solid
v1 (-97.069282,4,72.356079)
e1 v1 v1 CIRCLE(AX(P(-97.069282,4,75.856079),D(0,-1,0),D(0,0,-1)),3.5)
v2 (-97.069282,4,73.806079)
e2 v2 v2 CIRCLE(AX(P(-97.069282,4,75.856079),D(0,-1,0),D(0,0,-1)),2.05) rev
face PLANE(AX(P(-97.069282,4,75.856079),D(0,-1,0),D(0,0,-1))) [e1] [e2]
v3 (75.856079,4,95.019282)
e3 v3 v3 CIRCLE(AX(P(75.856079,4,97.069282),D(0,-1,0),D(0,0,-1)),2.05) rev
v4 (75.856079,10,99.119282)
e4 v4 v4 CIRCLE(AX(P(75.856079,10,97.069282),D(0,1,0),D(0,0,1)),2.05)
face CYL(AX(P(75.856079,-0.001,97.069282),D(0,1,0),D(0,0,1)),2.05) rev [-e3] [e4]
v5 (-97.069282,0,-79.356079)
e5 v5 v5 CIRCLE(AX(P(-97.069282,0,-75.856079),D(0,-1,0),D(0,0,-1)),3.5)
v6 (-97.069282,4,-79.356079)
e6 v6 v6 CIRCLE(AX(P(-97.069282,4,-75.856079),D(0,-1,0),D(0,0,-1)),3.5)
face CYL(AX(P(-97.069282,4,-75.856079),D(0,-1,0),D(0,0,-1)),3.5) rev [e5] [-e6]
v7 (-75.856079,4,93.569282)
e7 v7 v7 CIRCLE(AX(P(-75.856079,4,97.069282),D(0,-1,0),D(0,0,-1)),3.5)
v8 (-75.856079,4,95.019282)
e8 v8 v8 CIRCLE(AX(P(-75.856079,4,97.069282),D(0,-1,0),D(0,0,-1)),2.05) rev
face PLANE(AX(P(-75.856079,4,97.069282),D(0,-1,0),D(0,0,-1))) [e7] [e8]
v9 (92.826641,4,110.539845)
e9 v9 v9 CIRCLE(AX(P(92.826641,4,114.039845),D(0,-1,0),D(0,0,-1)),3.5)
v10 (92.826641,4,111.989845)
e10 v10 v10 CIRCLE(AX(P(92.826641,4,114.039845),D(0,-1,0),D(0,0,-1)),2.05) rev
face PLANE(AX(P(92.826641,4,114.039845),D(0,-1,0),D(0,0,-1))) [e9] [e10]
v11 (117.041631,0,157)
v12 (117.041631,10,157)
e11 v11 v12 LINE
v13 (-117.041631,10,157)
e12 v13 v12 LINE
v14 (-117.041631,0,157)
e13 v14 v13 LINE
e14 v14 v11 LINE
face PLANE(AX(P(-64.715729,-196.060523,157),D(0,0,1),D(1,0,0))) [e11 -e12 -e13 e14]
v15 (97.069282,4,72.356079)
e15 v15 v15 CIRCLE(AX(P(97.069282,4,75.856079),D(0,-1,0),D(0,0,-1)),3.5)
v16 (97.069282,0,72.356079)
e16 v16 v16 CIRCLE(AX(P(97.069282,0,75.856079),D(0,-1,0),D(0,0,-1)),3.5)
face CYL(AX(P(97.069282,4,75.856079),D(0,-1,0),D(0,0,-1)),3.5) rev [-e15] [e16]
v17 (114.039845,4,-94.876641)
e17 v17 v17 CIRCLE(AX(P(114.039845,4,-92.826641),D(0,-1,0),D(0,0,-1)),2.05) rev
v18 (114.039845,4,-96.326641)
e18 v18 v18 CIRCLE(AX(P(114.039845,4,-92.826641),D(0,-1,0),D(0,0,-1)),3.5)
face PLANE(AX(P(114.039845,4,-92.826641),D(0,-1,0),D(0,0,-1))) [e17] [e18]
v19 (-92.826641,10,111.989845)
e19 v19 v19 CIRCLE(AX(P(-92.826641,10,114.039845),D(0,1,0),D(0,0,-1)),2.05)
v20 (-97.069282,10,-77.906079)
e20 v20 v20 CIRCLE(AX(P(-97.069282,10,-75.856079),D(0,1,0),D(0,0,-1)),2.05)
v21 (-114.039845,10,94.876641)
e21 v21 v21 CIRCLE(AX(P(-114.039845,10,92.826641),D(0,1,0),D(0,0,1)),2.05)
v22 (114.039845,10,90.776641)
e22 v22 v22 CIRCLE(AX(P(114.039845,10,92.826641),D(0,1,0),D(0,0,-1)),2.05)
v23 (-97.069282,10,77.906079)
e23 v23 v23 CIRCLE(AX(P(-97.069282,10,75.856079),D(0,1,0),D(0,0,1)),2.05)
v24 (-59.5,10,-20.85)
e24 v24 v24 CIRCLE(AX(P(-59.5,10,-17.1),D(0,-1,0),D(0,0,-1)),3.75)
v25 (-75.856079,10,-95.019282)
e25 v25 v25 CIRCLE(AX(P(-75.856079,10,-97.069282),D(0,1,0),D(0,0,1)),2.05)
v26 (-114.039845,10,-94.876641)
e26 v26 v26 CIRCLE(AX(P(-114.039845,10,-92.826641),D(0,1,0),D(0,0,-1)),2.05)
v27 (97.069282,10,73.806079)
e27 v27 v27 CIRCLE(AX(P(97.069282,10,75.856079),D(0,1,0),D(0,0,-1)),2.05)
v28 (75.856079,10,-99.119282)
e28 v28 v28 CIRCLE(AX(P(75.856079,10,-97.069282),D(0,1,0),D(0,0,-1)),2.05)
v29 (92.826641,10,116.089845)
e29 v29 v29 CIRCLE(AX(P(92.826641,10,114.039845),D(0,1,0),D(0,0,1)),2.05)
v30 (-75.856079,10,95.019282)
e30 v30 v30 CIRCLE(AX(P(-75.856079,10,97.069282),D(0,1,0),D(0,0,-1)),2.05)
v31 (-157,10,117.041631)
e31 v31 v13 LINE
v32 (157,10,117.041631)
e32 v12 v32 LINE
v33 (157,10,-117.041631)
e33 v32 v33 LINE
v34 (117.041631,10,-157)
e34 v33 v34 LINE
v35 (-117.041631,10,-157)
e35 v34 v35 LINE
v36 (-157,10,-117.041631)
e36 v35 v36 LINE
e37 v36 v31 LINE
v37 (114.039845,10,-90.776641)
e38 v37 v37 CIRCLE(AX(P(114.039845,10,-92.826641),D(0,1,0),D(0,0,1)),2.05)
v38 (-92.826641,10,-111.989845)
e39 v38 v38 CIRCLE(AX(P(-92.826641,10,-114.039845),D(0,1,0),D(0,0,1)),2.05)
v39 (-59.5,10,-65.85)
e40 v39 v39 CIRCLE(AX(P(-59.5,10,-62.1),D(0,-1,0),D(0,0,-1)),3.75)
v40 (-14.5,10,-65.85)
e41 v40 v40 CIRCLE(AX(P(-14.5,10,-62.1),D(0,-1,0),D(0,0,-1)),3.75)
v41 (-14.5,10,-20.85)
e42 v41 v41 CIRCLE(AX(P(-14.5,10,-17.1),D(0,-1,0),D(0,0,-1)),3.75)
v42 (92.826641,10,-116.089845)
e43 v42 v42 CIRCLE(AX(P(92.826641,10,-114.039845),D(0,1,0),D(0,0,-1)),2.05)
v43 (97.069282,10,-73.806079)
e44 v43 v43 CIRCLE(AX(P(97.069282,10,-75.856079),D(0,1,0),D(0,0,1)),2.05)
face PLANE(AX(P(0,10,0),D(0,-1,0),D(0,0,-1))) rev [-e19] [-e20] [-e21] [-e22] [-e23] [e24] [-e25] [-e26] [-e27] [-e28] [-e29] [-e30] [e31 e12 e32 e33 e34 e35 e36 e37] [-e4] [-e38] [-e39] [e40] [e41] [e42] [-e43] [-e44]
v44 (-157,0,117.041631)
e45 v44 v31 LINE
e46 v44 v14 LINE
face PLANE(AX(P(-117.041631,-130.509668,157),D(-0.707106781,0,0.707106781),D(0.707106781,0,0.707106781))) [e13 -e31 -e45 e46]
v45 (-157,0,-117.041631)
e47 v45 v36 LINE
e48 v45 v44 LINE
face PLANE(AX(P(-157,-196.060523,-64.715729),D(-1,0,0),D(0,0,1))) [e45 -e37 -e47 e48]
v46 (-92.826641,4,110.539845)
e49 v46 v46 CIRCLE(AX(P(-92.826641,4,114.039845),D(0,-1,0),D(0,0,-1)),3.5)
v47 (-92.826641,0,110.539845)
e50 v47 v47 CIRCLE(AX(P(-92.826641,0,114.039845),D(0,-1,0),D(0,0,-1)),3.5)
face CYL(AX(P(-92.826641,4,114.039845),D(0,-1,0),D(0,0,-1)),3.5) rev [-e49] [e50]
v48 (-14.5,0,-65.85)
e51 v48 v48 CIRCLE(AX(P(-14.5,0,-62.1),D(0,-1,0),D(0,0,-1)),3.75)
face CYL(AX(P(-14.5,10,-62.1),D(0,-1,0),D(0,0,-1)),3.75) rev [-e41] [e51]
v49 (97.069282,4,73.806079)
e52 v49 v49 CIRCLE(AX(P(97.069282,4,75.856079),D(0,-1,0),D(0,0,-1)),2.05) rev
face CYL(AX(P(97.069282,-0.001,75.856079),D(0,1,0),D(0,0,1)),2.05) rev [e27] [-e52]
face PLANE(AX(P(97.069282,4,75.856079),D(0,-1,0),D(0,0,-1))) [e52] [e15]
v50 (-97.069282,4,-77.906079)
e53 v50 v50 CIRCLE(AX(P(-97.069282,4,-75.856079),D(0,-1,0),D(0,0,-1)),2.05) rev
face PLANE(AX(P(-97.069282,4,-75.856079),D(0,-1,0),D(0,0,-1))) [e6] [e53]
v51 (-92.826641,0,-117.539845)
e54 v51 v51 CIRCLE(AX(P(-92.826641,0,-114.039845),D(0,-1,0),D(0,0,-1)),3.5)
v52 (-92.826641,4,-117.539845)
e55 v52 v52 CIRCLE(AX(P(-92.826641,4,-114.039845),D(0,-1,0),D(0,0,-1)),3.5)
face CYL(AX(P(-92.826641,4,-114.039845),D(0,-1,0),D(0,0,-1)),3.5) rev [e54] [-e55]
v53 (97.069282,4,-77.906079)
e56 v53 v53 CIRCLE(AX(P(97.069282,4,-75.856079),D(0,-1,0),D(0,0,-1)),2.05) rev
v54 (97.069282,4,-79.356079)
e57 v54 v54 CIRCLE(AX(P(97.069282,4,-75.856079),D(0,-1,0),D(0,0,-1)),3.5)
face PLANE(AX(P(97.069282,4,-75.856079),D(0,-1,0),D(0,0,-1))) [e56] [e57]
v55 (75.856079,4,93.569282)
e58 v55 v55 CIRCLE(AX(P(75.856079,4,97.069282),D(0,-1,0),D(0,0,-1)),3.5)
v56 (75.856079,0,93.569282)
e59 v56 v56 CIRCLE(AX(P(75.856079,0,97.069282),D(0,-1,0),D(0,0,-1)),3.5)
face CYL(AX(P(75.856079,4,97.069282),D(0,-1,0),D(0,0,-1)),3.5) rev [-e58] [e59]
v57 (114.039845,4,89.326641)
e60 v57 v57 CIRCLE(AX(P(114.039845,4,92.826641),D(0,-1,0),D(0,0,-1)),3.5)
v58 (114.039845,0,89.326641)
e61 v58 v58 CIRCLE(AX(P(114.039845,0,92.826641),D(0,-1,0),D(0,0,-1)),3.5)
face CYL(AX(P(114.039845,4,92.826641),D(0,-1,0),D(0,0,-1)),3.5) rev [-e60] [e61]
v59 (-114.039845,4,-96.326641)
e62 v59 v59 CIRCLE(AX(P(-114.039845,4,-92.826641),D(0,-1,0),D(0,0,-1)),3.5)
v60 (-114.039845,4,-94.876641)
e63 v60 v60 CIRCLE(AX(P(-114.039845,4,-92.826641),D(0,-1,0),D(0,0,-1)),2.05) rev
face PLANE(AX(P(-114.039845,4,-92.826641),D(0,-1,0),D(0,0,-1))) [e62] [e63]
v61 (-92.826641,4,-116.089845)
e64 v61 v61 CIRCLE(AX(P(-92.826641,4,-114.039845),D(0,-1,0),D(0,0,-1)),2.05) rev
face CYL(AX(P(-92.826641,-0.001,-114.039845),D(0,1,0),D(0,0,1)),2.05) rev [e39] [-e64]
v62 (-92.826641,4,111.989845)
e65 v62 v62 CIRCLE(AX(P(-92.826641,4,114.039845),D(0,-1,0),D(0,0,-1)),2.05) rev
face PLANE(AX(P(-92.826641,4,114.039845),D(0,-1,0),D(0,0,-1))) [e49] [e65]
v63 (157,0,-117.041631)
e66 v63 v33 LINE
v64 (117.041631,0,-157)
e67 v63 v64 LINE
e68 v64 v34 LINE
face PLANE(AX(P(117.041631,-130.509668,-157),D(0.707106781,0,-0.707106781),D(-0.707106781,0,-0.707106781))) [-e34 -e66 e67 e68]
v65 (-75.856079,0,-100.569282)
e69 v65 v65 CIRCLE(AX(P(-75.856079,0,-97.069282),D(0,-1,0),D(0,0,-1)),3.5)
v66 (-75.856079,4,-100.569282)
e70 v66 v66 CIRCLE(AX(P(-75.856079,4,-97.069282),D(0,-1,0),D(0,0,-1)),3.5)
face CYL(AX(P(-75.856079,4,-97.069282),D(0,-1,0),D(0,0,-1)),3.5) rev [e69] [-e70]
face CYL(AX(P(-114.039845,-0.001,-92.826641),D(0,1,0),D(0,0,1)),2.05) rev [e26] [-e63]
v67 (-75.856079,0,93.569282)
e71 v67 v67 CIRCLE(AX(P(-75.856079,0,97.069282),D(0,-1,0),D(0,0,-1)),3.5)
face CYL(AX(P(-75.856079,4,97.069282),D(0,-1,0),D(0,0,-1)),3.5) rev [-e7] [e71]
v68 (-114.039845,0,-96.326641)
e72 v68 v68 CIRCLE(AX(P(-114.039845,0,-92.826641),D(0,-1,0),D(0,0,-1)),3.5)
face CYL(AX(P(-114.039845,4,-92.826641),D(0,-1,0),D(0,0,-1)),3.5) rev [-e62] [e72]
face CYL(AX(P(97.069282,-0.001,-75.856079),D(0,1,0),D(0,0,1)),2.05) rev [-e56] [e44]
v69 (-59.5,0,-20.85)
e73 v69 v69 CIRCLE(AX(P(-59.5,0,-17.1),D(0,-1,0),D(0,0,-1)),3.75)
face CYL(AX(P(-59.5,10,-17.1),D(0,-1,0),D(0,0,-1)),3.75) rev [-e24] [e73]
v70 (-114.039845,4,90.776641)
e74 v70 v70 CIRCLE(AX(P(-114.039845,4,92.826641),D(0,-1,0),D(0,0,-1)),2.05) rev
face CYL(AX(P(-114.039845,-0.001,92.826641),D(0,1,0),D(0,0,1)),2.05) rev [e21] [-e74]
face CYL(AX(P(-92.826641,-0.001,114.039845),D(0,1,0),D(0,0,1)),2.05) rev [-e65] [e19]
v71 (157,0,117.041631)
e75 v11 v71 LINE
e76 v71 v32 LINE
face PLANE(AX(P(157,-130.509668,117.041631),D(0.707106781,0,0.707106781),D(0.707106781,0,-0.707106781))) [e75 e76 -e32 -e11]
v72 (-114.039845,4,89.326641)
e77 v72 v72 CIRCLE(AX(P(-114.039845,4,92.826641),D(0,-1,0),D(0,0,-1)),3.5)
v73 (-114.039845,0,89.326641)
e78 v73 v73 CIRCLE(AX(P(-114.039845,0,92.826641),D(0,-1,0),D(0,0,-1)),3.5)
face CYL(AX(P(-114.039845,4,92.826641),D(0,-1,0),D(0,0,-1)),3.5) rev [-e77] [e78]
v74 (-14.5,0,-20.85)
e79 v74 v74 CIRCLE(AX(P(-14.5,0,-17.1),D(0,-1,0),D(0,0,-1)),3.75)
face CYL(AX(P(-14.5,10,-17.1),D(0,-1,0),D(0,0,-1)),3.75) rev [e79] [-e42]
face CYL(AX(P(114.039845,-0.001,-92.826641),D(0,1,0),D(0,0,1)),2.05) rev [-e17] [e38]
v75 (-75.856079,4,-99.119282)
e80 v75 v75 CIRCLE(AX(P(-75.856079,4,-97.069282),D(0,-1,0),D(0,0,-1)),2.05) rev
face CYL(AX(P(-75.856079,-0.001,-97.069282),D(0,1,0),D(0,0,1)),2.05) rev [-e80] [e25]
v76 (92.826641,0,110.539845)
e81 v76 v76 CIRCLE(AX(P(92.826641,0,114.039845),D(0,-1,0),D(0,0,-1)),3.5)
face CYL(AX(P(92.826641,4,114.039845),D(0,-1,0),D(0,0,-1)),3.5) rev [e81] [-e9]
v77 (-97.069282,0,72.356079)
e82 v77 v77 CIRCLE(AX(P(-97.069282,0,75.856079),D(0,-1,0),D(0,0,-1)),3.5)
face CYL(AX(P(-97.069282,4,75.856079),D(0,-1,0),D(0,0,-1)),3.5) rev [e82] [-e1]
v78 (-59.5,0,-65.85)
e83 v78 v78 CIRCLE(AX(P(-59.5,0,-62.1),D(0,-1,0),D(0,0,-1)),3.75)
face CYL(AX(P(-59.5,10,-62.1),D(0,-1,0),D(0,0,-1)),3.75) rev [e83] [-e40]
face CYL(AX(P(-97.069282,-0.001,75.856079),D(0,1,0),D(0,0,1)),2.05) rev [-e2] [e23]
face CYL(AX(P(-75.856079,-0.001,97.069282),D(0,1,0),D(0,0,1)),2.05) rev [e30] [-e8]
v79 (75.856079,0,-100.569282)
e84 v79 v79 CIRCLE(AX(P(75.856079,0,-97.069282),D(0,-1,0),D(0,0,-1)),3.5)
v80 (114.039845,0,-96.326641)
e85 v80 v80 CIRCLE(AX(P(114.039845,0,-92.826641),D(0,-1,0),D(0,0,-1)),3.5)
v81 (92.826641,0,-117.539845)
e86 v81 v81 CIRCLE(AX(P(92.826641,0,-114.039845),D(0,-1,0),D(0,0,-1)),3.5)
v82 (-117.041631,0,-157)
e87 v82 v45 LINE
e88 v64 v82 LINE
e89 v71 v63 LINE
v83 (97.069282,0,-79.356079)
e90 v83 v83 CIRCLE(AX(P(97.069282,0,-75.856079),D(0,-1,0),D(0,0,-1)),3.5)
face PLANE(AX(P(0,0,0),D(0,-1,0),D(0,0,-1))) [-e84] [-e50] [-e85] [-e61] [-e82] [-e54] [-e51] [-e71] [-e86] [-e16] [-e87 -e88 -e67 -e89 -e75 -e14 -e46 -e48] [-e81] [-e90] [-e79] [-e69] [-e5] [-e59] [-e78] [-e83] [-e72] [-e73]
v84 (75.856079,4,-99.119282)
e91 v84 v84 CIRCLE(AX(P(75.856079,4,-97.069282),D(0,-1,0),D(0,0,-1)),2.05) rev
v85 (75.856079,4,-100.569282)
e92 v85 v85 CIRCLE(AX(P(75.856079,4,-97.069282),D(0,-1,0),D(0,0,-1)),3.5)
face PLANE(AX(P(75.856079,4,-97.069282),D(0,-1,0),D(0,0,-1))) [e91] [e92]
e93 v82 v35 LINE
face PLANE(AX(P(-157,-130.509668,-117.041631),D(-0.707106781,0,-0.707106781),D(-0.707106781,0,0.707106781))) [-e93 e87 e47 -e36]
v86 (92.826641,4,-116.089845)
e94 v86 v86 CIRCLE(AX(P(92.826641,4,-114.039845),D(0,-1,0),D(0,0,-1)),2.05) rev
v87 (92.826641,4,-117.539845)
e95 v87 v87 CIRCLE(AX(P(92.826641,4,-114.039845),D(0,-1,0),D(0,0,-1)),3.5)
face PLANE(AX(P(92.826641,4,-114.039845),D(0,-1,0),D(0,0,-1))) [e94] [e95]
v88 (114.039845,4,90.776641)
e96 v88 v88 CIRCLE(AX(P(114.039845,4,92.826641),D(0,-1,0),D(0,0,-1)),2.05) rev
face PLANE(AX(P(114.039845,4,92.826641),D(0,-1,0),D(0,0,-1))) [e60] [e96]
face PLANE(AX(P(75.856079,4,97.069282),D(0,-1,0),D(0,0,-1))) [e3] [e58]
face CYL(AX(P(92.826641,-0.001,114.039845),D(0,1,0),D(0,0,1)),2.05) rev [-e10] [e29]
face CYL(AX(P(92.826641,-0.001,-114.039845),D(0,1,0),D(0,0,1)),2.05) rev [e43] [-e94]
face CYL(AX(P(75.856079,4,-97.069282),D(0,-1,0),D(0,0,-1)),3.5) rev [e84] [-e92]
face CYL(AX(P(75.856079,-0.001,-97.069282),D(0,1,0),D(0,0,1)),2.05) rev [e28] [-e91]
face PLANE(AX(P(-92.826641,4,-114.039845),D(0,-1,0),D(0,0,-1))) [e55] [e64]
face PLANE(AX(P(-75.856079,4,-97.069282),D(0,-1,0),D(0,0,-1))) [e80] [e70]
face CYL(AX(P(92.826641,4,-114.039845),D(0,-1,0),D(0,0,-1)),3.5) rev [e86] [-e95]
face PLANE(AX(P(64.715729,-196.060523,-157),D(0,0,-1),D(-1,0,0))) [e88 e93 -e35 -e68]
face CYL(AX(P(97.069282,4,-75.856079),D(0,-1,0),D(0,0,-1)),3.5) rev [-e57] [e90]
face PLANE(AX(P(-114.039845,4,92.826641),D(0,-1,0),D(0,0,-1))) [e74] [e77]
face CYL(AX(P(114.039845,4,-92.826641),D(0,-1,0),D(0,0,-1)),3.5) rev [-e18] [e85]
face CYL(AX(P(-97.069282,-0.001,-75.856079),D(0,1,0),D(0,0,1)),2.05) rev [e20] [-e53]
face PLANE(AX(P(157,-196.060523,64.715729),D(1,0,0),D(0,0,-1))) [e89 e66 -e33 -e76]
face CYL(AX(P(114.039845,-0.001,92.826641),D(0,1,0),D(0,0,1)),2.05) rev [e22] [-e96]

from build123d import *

# Parameters (mm, degrees)
BOSS_EXTRUDE1_DEPTH = 10
CUT_EXTRUDE1_REACH  = 179.059
SKETCH2_R           = 2.05
BOSS_EXTRUDE2_DEPTH = 10
BOSS_EXTRUDE3_DEPTH = 10
SKETCH5_R           = 3.5
CUT_EXTRUDE2_DEPTH  = 4
SKETCH6_R           = 3.75
CUT_EXTRUDE4_DEPTH  = 223.256608451


# Read off the part's stored shape, not the designer's step: moBlkMgr[DitRB1]
with BuildPart() as part:
    # Sketch1 → Boss-Extrude1 (new body)
    with BuildSketch(Plane(origin=(0, 0, 0), x_dir=(1, 0, 0), z_dir=(0, 1, 0))):
        Polygon((-96.715728753, 125), (-125, 96.715728753), (-125, -96.715728753), (-96.715728753, -125), (96.715728753, -125), (125, -96.715728753), (125, 96.715728753), (96.715728753, 125), align=None)
    extrude(amount=BOSS_EXTRUDE1_DEPTH)

    # Sketch2 → Cut-Extrude1 (cut, up to next)
    with BuildSketch(Plane(origin=(0, 10, 0), x_dir=(1, 0, 0), z_dir=(0, 1, 0)), mode=Mode.PRIVATE) as cut_extrude1_sk1:
        with Locations(Location((-97.069282143, -75.856078708, 0), (0, 0, 270))):
            Circle(SKETCH2_R)
    cut_extrude1_tool1 = extrude(cut_extrude1_sk1.sketch, amount=-CUT_EXTRUDE1_REACH, mode=Mode.PRIVATE) & part.part
    # Sketch2 → Cut-Extrude1 (cut, up to next)
    with BuildSketch(Plane(origin=(0, 10, 0), x_dir=(1, 0, 0), z_dir=(0, 1, 0)), mode=Mode.PRIVATE) as cut_extrude1_sk2:
        with Locations(Location((-114.039844892, -92.826641456, 0), (0, 0, 270))):
            Circle(SKETCH2_R)
    cut_extrude1_tool2 = extrude(cut_extrude1_sk2.sketch, amount=-CUT_EXTRUDE1_REACH, mode=Mode.PRIVATE) & part.part
    # Sketch2 → Cut-Extrude1 (cut, up to next)
    with BuildSketch(Plane(origin=(0, 10, 0), x_dir=(1, 0, 0), z_dir=(0, 1, 0)), mode=Mode.PRIVATE) as cut_extrude1_sk3:
        with Locations(Location((-75.856078708, -97.069282143, 0), (0, 0, 90))):
            Circle(SKETCH2_R)
    cut_extrude1_tool3 = extrude(cut_extrude1_sk3.sketch, amount=-CUT_EXTRUDE1_REACH, mode=Mode.PRIVATE) & part.part
    # Sketch2 → Cut-Extrude1 (cut, up to next)
    with BuildSketch(Plane(origin=(0, 10, 0), x_dir=(1, 0, 0), z_dir=(0, 1, 0)), mode=Mode.PRIVATE) as cut_extrude1_sk4:
        with Locations(Location((-92.826641456, -114.039844892, 0), (0, 0, 90))):
            Circle(SKETCH2_R)
    cut_extrude1_tool4 = extrude(cut_extrude1_sk4.sketch, amount=-CUT_EXTRUDE1_REACH, mode=Mode.PRIVATE) & part.part
    # Sketch2 → Cut-Extrude1 (cut, up to next)
    with BuildSketch(Plane(origin=(0, 10, 0), x_dir=(1, 0, 0), z_dir=(0, 1, 0)), mode=Mode.PRIVATE) as cut_extrude1_sk5:
        with Locations(Location((-75.856078708, 97.069282143, 0), (0, 0, 270))):
            Circle(SKETCH2_R)
    cut_extrude1_tool5 = extrude(cut_extrude1_sk5.sketch, amount=-CUT_EXTRUDE1_REACH, mode=Mode.PRIVATE) & part.part
    # Sketch2 → Cut-Extrude1 (cut, up to next)
    with BuildSketch(Plane(origin=(0, 10, 0), x_dir=(1, 0, 0), z_dir=(0, 1, 0)), mode=Mode.PRIVATE) as cut_extrude1_sk6:
        with Locations(Location((-92.826641456, 114.039844892, 0), (0, 0, 270))):
            Circle(SKETCH2_R)
    cut_extrude1_tool6 = extrude(cut_extrude1_sk6.sketch, amount=-CUT_EXTRUDE1_REACH, mode=Mode.PRIVATE) & part.part
    # Sketch2 → Cut-Extrude1 (cut, up to next)
    with BuildSketch(Plane(origin=(0, 10, 0), x_dir=(1, 0, 0), z_dir=(0, 1, 0)), mode=Mode.PRIVATE) as cut_extrude1_sk7:
        with Locations(Location((-114.039844892, 92.826641456, 0), (0, 0, 90))):
            Circle(SKETCH2_R)
    cut_extrude1_tool7 = extrude(cut_extrude1_sk7.sketch, amount=-CUT_EXTRUDE1_REACH, mode=Mode.PRIVATE) & part.part
    # Sketch2 → Cut-Extrude1 (cut, up to next)
    with BuildSketch(Plane(origin=(0, 10, 0), x_dir=(1, 0, 0), z_dir=(0, 1, 0)), mode=Mode.PRIVATE) as cut_extrude1_sk8:
        with Locations(Location((-97.069282143, 75.856078708, 0), (0, 0, 90))):
            Circle(SKETCH2_R)
    cut_extrude1_tool8 = extrude(cut_extrude1_sk8.sketch, amount=-CUT_EXTRUDE1_REACH, mode=Mode.PRIVATE) & part.part
    # Sketch2 → Cut-Extrude1 (cut, up to next)
    with BuildSketch(Plane(origin=(0, 10, 0), x_dir=(1, 0, 0), z_dir=(0, 1, 0)), mode=Mode.PRIVATE) as cut_extrude1_sk9:
        with Locations(Location((97.069282143, 75.856078708, 0), (0, 0, 270))):
            Circle(SKETCH2_R)
    cut_extrude1_tool9 = extrude(cut_extrude1_sk9.sketch, amount=-CUT_EXTRUDE1_REACH, mode=Mode.PRIVATE) & part.part
    # Sketch2 → Cut-Extrude1 (cut, up to next)
    with BuildSketch(Plane(origin=(0, 10, 0), x_dir=(1, 0, 0), z_dir=(0, 1, 0)), mode=Mode.PRIVATE) as cut_extrude1_sk10:
        with Locations(Location((114.039844892, 92.826641456, 0), (0, 0, 270))):
            Circle(SKETCH2_R)
    cut_extrude1_tool10 = extrude(cut_extrude1_sk10.sketch, amount=-CUT_EXTRUDE1_REACH, mode=Mode.PRIVATE) & part.part
    # Sketch2 → Cut-Extrude1 (cut, up to next)
    with BuildSketch(Plane(origin=(0, 10, 0), x_dir=(1, 0, 0), z_dir=(0, 1, 0)), mode=Mode.PRIVATE) as cut_extrude1_sk11:
        with Locations(Location((92.826641456, 114.039844892, 0), (0, 0, 90))):
            Circle(SKETCH2_R)
    cut_extrude1_tool11 = extrude(cut_extrude1_sk11.sketch, amount=-CUT_EXTRUDE1_REACH, mode=Mode.PRIVATE) & part.part
    # Sketch2 → Cut-Extrude1 (cut, up to next)
    with BuildSketch(Plane(origin=(0, 10, 0), x_dir=(1, 0, 0), z_dir=(0, 1, 0)), mode=Mode.PRIVATE) as cut_extrude1_sk12:
        with Locations(Location((75.856078708, 97.069282143, 0), (0, 0, 90))):
            Circle(SKETCH2_R)
    cut_extrude1_tool12 = extrude(cut_extrude1_sk12.sketch, amount=-CUT_EXTRUDE1_REACH, mode=Mode.PRIVATE) & part.part
    # Sketch2 → Cut-Extrude1 (cut, up to next)
    with BuildSketch(Plane(origin=(0, 10, 0), x_dir=(1, 0, 0), z_dir=(0, 1, 0)), mode=Mode.PRIVATE) as cut_extrude1_sk13:
        with Locations(Location((75.856078708, -97.069282143, 0), (0, 0, 270))):
            Circle(SKETCH2_R)
    cut_extrude1_tool13 = extrude(cut_extrude1_sk13.sketch, amount=-CUT_EXTRUDE1_REACH, mode=Mode.PRIVATE) & part.part
    # Sketch2 → Cut-Extrude1 (cut, up to next)
    with BuildSketch(Plane(origin=(0, 10, 0), x_dir=(1, 0, 0), z_dir=(0, 1, 0)), mode=Mode.PRIVATE) as cut_extrude1_sk14:
        with Locations(Location((92.826641456, -114.039844892, 0), (0, 0, 270))):
            Circle(SKETCH2_R)
    cut_extrude1_tool14 = extrude(cut_extrude1_sk14.sketch, amount=-CUT_EXTRUDE1_REACH, mode=Mode.PRIVATE) & part.part
    # Sketch2 → Cut-Extrude1 (cut, up to next)
    with BuildSketch(Plane(origin=(0, 10, 0), x_dir=(1, 0, 0), z_dir=(0, 1, 0)), mode=Mode.PRIVATE) as cut_extrude1_sk15:
        with Locations(Location((114.039844892, -92.826641456, 0), (0, 0, 90))):
            Circle(SKETCH2_R)
    cut_extrude1_tool15 = extrude(cut_extrude1_sk15.sketch, amount=-CUT_EXTRUDE1_REACH, mode=Mode.PRIVATE) & part.part
    # Sketch2 → Cut-Extrude1 (cut, up to next)
    with BuildSketch(Plane(origin=(0, 10, 0), x_dir=(1, 0, 0), z_dir=(0, 1, 0)), mode=Mode.PRIVATE) as cut_extrude1_sk16:
        with Locations(Location((97.069282143, -75.856078708, 0), (0, 0, 90))):
            Circle(SKETCH2_R)
    cut_extrude1_tool16 = extrude(cut_extrude1_sk16.sketch, amount=-CUT_EXTRUDE1_REACH, mode=Mode.PRIVATE) & part.part
    add(cut_extrude1_tool1.solids().sort_by_distance((-97.069282, 10, 75.856079))[0], mode=Mode.SUBTRACT)
    add(cut_extrude1_tool2.solids().sort_by_distance((-114.039845, 10, 92.826641))[0], mode=Mode.SUBTRACT)
    add(cut_extrude1_tool3.solids().sort_by_distance((-75.856079, 10, 97.069282))[0], mode=Mode.SUBTRACT)
    add(cut_extrude1_tool4.solids().sort_by_distance((-92.826641, 10, 114.039845))[0], mode=Mode.SUBTRACT)
    add(cut_extrude1_tool5.solids().sort_by_distance((-75.856079, 10, -97.069282))[0], mode=Mode.SUBTRACT)
    add(cut_extrude1_tool6.solids().sort_by_distance((-92.826641, 10, -114.039845))[0], mode=Mode.SUBTRACT)
    add(cut_extrude1_tool7.solids().sort_by_distance((-114.039845, 10, -92.826641))[0], mode=Mode.SUBTRACT)
    add(cut_extrude1_tool8.solids().sort_by_distance((-97.069282, 10, -75.856079))[0], mode=Mode.SUBTRACT)
    add(cut_extrude1_tool9.solids().sort_by_distance((97.069282, 10, -75.856079))[0], mode=Mode.SUBTRACT)
    add(cut_extrude1_tool10.solids().sort_by_distance((114.039845, 10, -92.826641))[0], mode=Mode.SUBTRACT)
    add(cut_extrude1_tool11.solids().sort_by_distance((92.826641, 10, -114.039845))[0], mode=Mode.SUBTRACT)
    add(cut_extrude1_tool12.solids().sort_by_distance((75.856079, 10, -97.069282))[0], mode=Mode.SUBTRACT)
    add(cut_extrude1_tool13.solids().sort_by_distance((75.856079, 10, 97.069282))[0], mode=Mode.SUBTRACT)
    add(cut_extrude1_tool14.solids().sort_by_distance((92.826641, 10, 114.039845))[0], mode=Mode.SUBTRACT)
    add(cut_extrude1_tool15.solids().sort_by_distance((114.039845, 10, 92.826641))[0], mode=Mode.SUBTRACT)
    add(cut_extrude1_tool16.solids().sort_by_distance((97.069282, 10, 75.856079))[0], mode=Mode.SUBTRACT)

    # Sketch3 → Boss-Extrude2 (add)
    with BuildSketch(Plane(origin=(0, 10, 0), x_dir=(1, 0, 0), z_dir=(0, 1, 0))):
        Polygon((-125, 96.715728753), (-157, 64.715728753), (-157, -64.715728753), (-125, -96.715728753), align=None)
        Polygon((64.715728753, 157), (-64.715728753, 157), (-96.715728753, 125), (96.715728753, 125), align=None)
        Polygon((157, -64.715728753), (157, 64.715728753), (125, 96.715728753), (125, -96.715728753), align=None)
        Polygon((-64.715728753, -157), (64.715728753, -157), (96.715728753, -125), (-96.715728753, -125), align=None)
    extrude(amount=-BOSS_EXTRUDE2_DEPTH)

    # Sketch4 → Boss-Extrude3 (add)
    with BuildSketch(Plane(origin=(0, 10, 0), x_dir=(1, 0, 0), z_dir=(0, 1, 0))):
        Polygon((-157, 64.715728753), (-64.715728753, 157), (-117.04163056, 157), (-157, 117.04163056), align=None)
        Polygon((64.715728753, 157), (157, 64.715728753), (157, 117.04163056), (117.04163056, 157), align=None)
        Polygon((157, -64.715728753), (64.715728753, -157), (117.04163056, -157), (157, -117.04163056), align=None)
        Polygon((-64.715728753, -157), (-157, -64.715728753), (-157, -117.04163056), (-117.04163056, -157), align=None)
    extrude(amount=-BOSS_EXTRUDE3_DEPTH)

    # Sketch5 → Cut-Extrude2 (cut)
    with BuildSketch(Plane.XZ):
        with Locations(Location((-114.039844892, 92.826641456, 0), (0, 0, 270))):
            Circle(SKETCH5_R)
        with Locations(Location((-92.826641456, 114.039844892, 0), (0, 0, 270))):
            Circle(SKETCH5_R)
        with Locations(Location((-75.856078708, 97.069282143, 0), (0, 0, 270))):
            Circle(SKETCH5_R)
        with Locations(Location((-97.069282143, 75.856078708, 0), (0, 0, 270))):
            Circle(SKETCH5_R)
        with Locations(Location((114.039844892, 92.826641456, 0), (0, 0, 270))):
            Circle(SKETCH5_R)
        with Locations(Location((92.826641456, 114.039844892, 0), (0, 0, 270))):
            Circle(SKETCH5_R)
        with Locations(Location((75.856078708, 97.069282143, 0), (0, 0, 270))):
            Circle(SKETCH5_R)
        with Locations(Location((97.069282143, 75.856078708, 0), (0, 0, 270))):
            Circle(SKETCH5_R)
        with Locations(Location((92.826641456, -114.039844892, 0), (0, 0, 270))):
            Circle(SKETCH5_R)
        with Locations(Location((114.039844892, -92.826641456, 0), (0, 0, 270))):
            Circle(SKETCH5_R)
        with Locations(Location((97.069282143, -75.856078708, 0), (0, 0, 270))):
            Circle(SKETCH5_R)
        with Locations(Location((75.856078708, -97.069282143, 0), (0, 0, 270))):
            Circle(SKETCH5_R)
        with Locations(Location((-114.039844892, -92.826641456, 0), (0, 0, 270))):
            Circle(SKETCH5_R)
        with Locations(Location((-92.826641456, -114.039844892, 0), (0, 0, 270))):
            Circle(SKETCH5_R)
        with Locations(Location((-75.856078708, -97.069282143, 0), (0, 0, 270))):
            Circle(SKETCH5_R)
        with Locations(Location((-97.069282143, -75.856078708, 0), (0, 0, 270))):
            Circle(SKETCH5_R)
    extrude(amount=-CUT_EXTRUDE2_DEPTH, mode=Mode.SUBTRACT)

    # Sketch6 → Cut-Extrude4 (cut, through all)
    with BuildSketch(Plane.XZ):
        with Locations(Location((-59.5, -17.1, 0), (0, 0, 270))):
            Circle(SKETCH6_R)
        with Locations(Location((-14.5, -17.1, 0), (0, 0, 270))):
            Circle(SKETCH6_R)
        with Locations(Location((-14.5, -62.1, 0), (0, 0, 270))):
            Circle(SKETCH6_R)
        with Locations(Location((-59.5, -62.1, 0), (0, 0, 270))):
            Circle(SKETCH6_R)
    extrude(amount=-CUT_EXTRUDE4_DEPTH, mode=Mode.SUBTRACT)


solid = part.part
